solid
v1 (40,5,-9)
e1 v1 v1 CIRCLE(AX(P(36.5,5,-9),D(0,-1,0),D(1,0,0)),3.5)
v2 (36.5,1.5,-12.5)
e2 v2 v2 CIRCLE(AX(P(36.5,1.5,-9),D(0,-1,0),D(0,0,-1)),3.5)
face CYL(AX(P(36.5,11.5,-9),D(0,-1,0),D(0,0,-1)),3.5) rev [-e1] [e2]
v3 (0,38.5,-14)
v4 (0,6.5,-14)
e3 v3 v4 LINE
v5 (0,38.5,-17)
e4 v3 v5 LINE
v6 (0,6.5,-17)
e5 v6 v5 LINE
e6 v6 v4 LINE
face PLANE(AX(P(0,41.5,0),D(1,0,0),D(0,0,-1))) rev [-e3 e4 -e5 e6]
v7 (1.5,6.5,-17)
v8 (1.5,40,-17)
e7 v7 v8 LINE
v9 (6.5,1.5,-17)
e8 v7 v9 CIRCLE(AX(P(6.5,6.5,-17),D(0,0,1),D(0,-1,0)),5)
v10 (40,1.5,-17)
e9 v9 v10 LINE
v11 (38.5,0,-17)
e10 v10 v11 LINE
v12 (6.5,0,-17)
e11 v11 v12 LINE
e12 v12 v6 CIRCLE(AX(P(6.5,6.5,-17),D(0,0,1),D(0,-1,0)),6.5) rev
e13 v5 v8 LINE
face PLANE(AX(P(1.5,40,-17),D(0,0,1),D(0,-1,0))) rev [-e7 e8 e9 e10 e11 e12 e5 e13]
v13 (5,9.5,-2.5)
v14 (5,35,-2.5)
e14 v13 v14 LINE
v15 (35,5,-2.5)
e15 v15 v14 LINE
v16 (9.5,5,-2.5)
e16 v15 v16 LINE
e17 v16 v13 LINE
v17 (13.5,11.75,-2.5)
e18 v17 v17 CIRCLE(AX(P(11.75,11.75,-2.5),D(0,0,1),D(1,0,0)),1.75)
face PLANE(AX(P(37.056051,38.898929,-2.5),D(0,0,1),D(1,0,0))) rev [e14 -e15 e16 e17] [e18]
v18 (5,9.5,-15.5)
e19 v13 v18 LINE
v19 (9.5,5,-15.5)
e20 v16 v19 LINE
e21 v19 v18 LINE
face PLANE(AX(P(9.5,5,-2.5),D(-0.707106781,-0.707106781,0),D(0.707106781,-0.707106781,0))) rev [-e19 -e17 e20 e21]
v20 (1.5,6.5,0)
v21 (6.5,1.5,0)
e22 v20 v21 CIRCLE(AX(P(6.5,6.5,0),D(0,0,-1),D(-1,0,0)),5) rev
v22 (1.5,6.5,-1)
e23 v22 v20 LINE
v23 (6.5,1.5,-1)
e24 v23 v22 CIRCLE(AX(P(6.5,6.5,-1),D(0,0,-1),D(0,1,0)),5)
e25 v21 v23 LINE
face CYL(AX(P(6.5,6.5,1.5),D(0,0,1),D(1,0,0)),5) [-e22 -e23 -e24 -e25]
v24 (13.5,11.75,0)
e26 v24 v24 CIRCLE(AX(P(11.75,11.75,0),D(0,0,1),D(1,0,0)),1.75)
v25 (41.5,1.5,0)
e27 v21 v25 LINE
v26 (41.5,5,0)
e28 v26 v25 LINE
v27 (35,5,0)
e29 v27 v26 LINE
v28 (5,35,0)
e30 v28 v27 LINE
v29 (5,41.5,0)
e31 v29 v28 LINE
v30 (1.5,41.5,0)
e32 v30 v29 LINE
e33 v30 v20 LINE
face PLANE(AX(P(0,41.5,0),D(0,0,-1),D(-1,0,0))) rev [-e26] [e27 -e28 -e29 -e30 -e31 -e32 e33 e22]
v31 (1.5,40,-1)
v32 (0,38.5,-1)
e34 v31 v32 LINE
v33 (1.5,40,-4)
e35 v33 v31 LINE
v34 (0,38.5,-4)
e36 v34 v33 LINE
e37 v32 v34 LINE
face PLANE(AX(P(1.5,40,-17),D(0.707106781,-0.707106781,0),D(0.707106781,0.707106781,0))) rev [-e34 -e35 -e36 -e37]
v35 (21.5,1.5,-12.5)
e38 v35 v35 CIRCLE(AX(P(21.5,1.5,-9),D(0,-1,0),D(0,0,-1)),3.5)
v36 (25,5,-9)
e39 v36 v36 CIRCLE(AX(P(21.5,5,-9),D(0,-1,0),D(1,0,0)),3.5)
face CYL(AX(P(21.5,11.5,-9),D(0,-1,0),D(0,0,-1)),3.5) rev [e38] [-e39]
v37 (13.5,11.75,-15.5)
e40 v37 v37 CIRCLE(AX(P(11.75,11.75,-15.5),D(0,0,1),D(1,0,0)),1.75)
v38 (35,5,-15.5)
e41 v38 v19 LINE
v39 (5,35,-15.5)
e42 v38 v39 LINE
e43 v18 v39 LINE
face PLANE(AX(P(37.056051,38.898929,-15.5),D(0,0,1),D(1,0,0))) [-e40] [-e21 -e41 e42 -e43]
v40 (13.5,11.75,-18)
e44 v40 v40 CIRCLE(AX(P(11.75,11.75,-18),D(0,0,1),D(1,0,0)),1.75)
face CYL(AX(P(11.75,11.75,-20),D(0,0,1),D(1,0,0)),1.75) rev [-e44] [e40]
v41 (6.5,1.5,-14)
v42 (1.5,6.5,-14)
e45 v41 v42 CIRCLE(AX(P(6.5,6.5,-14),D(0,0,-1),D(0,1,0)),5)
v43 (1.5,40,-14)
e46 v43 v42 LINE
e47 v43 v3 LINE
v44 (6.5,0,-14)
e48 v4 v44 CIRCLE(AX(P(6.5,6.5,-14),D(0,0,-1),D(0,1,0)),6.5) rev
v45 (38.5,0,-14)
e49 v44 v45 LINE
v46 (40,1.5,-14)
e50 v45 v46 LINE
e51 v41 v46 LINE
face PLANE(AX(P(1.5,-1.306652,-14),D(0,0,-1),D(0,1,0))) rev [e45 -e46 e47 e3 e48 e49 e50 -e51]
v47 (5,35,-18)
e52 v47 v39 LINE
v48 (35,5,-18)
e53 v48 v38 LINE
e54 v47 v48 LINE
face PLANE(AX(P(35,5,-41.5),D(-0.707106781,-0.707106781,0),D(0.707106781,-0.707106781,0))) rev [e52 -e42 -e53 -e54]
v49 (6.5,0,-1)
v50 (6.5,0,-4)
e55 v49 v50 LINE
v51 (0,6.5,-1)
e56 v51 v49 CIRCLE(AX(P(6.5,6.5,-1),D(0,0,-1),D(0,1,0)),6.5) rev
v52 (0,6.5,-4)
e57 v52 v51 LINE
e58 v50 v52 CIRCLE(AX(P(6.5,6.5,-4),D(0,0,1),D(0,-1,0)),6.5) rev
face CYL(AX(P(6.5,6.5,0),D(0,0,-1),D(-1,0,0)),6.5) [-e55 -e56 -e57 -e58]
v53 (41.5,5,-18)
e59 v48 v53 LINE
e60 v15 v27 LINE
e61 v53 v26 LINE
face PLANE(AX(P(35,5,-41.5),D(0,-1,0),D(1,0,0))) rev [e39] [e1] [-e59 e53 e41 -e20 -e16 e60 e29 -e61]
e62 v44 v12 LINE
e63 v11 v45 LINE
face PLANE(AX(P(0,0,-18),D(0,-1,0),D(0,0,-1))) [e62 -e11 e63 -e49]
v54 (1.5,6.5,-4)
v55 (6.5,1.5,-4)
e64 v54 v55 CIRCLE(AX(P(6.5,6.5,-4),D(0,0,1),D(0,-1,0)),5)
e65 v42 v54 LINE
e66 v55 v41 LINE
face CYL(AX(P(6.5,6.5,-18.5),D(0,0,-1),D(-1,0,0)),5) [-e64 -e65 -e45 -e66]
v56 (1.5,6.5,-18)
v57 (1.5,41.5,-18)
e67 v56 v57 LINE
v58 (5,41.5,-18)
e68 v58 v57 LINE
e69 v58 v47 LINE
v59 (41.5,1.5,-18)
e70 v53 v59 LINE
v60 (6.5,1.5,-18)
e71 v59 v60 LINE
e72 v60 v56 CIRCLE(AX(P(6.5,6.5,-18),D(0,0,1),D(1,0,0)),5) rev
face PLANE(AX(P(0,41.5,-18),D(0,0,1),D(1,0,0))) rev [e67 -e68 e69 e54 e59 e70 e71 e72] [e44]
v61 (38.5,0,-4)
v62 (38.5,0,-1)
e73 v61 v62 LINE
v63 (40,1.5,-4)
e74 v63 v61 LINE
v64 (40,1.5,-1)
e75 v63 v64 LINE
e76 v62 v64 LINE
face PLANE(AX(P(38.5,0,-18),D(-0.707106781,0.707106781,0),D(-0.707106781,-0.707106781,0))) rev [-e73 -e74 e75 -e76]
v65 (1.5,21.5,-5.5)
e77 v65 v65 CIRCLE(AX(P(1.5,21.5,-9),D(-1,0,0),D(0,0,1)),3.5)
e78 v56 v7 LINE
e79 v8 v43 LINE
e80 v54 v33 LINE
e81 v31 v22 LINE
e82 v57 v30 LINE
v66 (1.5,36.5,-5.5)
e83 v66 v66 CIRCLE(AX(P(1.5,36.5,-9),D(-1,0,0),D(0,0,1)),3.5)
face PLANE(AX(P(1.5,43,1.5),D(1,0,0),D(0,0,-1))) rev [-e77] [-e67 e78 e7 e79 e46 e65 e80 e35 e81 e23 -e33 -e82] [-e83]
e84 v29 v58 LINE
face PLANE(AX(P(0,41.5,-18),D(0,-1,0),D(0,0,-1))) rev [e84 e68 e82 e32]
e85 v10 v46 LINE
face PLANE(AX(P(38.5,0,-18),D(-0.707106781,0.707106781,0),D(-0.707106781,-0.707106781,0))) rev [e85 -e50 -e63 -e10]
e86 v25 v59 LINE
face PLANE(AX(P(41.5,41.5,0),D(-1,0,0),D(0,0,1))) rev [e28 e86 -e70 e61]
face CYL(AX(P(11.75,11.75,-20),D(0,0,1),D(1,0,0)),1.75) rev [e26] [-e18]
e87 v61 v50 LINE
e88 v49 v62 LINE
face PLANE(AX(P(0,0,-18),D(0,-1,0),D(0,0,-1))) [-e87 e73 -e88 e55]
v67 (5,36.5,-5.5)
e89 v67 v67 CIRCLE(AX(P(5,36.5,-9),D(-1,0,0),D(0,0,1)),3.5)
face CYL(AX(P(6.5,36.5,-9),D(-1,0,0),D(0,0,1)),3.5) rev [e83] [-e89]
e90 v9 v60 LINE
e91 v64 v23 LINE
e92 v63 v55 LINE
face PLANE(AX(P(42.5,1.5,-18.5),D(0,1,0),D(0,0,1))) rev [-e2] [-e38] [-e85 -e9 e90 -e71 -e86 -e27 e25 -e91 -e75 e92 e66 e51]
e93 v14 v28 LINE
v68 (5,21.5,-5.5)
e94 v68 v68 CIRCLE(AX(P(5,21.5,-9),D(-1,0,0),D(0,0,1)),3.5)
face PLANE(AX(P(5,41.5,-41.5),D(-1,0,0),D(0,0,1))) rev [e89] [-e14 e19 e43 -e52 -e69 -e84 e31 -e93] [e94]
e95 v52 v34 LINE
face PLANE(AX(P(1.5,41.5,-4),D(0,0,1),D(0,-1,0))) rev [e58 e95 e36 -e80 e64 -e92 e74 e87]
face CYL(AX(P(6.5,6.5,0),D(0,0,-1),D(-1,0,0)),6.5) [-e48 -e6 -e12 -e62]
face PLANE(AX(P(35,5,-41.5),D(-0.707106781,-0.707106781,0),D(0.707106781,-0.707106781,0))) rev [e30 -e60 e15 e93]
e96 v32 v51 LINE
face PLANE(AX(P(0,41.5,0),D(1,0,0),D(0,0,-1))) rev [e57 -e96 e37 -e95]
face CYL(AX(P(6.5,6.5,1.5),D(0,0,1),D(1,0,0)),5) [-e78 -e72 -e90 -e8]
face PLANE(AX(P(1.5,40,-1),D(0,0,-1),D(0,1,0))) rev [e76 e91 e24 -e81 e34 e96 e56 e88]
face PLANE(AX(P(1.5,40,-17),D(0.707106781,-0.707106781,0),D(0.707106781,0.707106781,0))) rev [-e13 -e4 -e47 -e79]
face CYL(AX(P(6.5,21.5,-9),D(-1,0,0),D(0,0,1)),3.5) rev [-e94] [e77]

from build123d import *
from OCP.BRepFilletAPI import BRepFilletAPI_MakeFillet

# Parameters (mm, degrees)
SKETCH_1_W           = 41.5
SKETCH_1_H           = 18
EXTRUDE_1_DEPTH      = 41.5
CUT_EXTRUDE_2_DEPTH  = 41.5
CUT_EXTRUDE_3_DEPTH  = 1.5
SKETCH_4_W           = 10
SKETCH_4_H           = 42.806652411
CUT_EXTRUDE_4_DEPTH  = 1.5
SKETCH_5_W           = 46.146220502
SKETCH_5_H           = 19
SKETCH_5_W_2         = 42.146220502
SKETCH_5_H_2         = 16
CUT_EXTRUDE_5_DEPTH  = 1.5
SKETCH_6_W           = 43.828309831
SKETCH_6_H           = 10
CUT_EXTRUDE_7_DEPTH  = 1.5
FILLET_8_R1          = 5
FILLET_8_R2          = 6.5
CHAMFER_1_SIZE       = 1.5
CUT_EXTRUDE_9_DEPTH  = 13
SKETCH_10_R          = 3.5
CUT_EXTRUDE_10_DEPTH = 10
SKETCH_11_R          = 3.5
CUT_EXTRUDE_11_DEPTH = 5
SKETCH_12_R          = 1.75
CUT_EXTRUDE_12_DEPTH = 20


with BuildPart() as part:
    # 草图1 → 拉伸1 (new body)
    with BuildSketch(Plane(origin=(0, 0, 0), x_dir=(1, 0, 0), z_dir=(0, 1, 0))):
        with Locations((20.75, 9)):
            Rectangle(SKETCH_1_W, SKETCH_1_H)
    extrude(amount=EXTRUDE_1_DEPTH)

    # 草图2 → 拉伸2 (cut)
    with BuildSketch(Plane.XY):
        Polygon((5, 41.5), (41.5, 41.5), (41.5, 5), (35, 5), (5, 35), align=None)
    extrude(amount=-CUT_EXTRUDE_2_DEPTH, mode=Mode.SUBTRACT)

    # 草图3 → 拉伸3 (cut)
    with BuildSketch(Plane.ZY):
        Polygon((1.5, 43), (1.5, -2.474095728), (-1, -2.474095728), (-1, 40), (-17, 40), (-17, -2.474095728), (-19.5, -2.474095728), (-19.5, 43), align=None)
    extrude(amount=-CUT_EXTRUDE_3_DEPTH, mode=Mode.SUBTRACT)

    # 草图4 → 拉伸4 (cut)
    with BuildSketch(Plane.ZY):
        with Locations((-9, 20.096673794)):
            Rectangle(SKETCH_4_W, SKETCH_4_H)
    extrude(amount=-CUT_EXTRUDE_4_DEPTH, mode=Mode.SUBTRACT)

    # 草图5 → 拉伸5 (cut)
    with BuildSketch(Plane.XZ):
        with Locations((19.426889749, -9)):
            Rectangle(SKETCH_5_W, SKETCH_5_H)
        with Locations((18.926889749, -9)):
            Rectangle(SKETCH_5_W_2, SKETCH_5_H_2, mode=Mode.SUBTRACT)
    extrude(amount=-CUT_EXTRUDE_5_DEPTH, mode=Mode.SUBTRACT)

    # 草图6 → 拉伸7 (cut)
    with BuildSketch(Plane.XZ):
        with Locations((19.585845085, -9)):
            Rectangle(SKETCH_6_W, SKETCH_6_H)
    extrude(amount=-CUT_EXTRUDE_7_DEPTH, mode=Mode.SUBTRACT)

    # 圆角8: one fillet with a radius per group of edges: ONE call of the kernel's fillet builder (fillet() takes one radius for all edges)
    fillet_8_edges_1 = [part.edges().sort_by_distance(p)[0] for p in [
        (1.5, 1.5, -17.5),
        (1.5, 1.5, -9),
        (1.5, 1.5, -0.5),
    ]]
    fillet_8_edges_2 = [part.edges().sort_by_distance(p)[0] for p in [
        (0, 0, -15.5),
        (0, 0, -2.5),
    ]]
    fillet_8 = BRepFilletAPI_MakeFillet(part.part.solid().wrapped)
    for e in fillet_8_edges_1:
        fillet_8.Add(FILLET_8_R1, e.wrapped)
    for e in fillet_8_edges_2:
        fillet_8.Add(FILLET_8_R2, e.wrapped)
    add(Compound.cast(fillet_8.Shape()), mode=Mode.REPLACE)

    # 倒角1
    chamfer_1_edges = [part.edges().sort_by_distance(p)[0] for p in [
        (0, 40, -2.5),
        (0, 40, -15.5),
        (40, 0, -2.5),
        (40, 0, -15.5),
    ]]
    chamfer(chamfer_1_edges, length=CHAMFER_1_SIZE - 0.0001)  # a hair under: the kernel refuses the full size

    # 草图9 → 拉伸9 (cut)
    with BuildSketch(Plane(origin=(0, 0, -15.5), x_dir=(-1, 0, 0), z_dir=(0, 0, -1))):
        Polygon((-5, 38.898928625), (-5, 9.5), (-9.5, 5), (-37.05605145, 5), (-37.05605145, 38.898928625), align=None)
    extrude(amount=-CUT_EXTRUDE_9_DEPTH, mode=Mode.SUBTRACT)

    # 草图10 → 拉伸10 (cut)
    with BuildSketch(Plane.XZ.offset(-1.5)):
        with Locations(Location((21.5, -9, 0), (0, 0, 270))):
            Circle(SKETCH_10_R)
        with Locations(Location((36.5, -9, 0), (0, 0, 270))):
            Circle(SKETCH_10_R)
    extrude(amount=-CUT_EXTRUDE_10_DEPTH, mode=Mode.SUBTRACT)

    # 草图11 → 拉伸11 (cut)
    with BuildSketch(Plane.ZY.offset(-1.5)):
        with Locations((-9, 21.5)):
            Circle(SKETCH_11_R)
        with Locations((-9, 36.5)):
            Circle(SKETCH_11_R)
    extrude(amount=-CUT_EXTRUDE_11_DEPTH, mode=Mode.SUBTRACT)

    # 草图12 → 拉伸12 (cut)
    with BuildSketch(Plane.XY):
        with Locations((11.75, 11.75)):
            Circle(SKETCH_12_R)
    extrude(amount=-CUT_EXTRUDE_12_DEPTH, mode=Mode.SUBTRACT)


solid = part.part
